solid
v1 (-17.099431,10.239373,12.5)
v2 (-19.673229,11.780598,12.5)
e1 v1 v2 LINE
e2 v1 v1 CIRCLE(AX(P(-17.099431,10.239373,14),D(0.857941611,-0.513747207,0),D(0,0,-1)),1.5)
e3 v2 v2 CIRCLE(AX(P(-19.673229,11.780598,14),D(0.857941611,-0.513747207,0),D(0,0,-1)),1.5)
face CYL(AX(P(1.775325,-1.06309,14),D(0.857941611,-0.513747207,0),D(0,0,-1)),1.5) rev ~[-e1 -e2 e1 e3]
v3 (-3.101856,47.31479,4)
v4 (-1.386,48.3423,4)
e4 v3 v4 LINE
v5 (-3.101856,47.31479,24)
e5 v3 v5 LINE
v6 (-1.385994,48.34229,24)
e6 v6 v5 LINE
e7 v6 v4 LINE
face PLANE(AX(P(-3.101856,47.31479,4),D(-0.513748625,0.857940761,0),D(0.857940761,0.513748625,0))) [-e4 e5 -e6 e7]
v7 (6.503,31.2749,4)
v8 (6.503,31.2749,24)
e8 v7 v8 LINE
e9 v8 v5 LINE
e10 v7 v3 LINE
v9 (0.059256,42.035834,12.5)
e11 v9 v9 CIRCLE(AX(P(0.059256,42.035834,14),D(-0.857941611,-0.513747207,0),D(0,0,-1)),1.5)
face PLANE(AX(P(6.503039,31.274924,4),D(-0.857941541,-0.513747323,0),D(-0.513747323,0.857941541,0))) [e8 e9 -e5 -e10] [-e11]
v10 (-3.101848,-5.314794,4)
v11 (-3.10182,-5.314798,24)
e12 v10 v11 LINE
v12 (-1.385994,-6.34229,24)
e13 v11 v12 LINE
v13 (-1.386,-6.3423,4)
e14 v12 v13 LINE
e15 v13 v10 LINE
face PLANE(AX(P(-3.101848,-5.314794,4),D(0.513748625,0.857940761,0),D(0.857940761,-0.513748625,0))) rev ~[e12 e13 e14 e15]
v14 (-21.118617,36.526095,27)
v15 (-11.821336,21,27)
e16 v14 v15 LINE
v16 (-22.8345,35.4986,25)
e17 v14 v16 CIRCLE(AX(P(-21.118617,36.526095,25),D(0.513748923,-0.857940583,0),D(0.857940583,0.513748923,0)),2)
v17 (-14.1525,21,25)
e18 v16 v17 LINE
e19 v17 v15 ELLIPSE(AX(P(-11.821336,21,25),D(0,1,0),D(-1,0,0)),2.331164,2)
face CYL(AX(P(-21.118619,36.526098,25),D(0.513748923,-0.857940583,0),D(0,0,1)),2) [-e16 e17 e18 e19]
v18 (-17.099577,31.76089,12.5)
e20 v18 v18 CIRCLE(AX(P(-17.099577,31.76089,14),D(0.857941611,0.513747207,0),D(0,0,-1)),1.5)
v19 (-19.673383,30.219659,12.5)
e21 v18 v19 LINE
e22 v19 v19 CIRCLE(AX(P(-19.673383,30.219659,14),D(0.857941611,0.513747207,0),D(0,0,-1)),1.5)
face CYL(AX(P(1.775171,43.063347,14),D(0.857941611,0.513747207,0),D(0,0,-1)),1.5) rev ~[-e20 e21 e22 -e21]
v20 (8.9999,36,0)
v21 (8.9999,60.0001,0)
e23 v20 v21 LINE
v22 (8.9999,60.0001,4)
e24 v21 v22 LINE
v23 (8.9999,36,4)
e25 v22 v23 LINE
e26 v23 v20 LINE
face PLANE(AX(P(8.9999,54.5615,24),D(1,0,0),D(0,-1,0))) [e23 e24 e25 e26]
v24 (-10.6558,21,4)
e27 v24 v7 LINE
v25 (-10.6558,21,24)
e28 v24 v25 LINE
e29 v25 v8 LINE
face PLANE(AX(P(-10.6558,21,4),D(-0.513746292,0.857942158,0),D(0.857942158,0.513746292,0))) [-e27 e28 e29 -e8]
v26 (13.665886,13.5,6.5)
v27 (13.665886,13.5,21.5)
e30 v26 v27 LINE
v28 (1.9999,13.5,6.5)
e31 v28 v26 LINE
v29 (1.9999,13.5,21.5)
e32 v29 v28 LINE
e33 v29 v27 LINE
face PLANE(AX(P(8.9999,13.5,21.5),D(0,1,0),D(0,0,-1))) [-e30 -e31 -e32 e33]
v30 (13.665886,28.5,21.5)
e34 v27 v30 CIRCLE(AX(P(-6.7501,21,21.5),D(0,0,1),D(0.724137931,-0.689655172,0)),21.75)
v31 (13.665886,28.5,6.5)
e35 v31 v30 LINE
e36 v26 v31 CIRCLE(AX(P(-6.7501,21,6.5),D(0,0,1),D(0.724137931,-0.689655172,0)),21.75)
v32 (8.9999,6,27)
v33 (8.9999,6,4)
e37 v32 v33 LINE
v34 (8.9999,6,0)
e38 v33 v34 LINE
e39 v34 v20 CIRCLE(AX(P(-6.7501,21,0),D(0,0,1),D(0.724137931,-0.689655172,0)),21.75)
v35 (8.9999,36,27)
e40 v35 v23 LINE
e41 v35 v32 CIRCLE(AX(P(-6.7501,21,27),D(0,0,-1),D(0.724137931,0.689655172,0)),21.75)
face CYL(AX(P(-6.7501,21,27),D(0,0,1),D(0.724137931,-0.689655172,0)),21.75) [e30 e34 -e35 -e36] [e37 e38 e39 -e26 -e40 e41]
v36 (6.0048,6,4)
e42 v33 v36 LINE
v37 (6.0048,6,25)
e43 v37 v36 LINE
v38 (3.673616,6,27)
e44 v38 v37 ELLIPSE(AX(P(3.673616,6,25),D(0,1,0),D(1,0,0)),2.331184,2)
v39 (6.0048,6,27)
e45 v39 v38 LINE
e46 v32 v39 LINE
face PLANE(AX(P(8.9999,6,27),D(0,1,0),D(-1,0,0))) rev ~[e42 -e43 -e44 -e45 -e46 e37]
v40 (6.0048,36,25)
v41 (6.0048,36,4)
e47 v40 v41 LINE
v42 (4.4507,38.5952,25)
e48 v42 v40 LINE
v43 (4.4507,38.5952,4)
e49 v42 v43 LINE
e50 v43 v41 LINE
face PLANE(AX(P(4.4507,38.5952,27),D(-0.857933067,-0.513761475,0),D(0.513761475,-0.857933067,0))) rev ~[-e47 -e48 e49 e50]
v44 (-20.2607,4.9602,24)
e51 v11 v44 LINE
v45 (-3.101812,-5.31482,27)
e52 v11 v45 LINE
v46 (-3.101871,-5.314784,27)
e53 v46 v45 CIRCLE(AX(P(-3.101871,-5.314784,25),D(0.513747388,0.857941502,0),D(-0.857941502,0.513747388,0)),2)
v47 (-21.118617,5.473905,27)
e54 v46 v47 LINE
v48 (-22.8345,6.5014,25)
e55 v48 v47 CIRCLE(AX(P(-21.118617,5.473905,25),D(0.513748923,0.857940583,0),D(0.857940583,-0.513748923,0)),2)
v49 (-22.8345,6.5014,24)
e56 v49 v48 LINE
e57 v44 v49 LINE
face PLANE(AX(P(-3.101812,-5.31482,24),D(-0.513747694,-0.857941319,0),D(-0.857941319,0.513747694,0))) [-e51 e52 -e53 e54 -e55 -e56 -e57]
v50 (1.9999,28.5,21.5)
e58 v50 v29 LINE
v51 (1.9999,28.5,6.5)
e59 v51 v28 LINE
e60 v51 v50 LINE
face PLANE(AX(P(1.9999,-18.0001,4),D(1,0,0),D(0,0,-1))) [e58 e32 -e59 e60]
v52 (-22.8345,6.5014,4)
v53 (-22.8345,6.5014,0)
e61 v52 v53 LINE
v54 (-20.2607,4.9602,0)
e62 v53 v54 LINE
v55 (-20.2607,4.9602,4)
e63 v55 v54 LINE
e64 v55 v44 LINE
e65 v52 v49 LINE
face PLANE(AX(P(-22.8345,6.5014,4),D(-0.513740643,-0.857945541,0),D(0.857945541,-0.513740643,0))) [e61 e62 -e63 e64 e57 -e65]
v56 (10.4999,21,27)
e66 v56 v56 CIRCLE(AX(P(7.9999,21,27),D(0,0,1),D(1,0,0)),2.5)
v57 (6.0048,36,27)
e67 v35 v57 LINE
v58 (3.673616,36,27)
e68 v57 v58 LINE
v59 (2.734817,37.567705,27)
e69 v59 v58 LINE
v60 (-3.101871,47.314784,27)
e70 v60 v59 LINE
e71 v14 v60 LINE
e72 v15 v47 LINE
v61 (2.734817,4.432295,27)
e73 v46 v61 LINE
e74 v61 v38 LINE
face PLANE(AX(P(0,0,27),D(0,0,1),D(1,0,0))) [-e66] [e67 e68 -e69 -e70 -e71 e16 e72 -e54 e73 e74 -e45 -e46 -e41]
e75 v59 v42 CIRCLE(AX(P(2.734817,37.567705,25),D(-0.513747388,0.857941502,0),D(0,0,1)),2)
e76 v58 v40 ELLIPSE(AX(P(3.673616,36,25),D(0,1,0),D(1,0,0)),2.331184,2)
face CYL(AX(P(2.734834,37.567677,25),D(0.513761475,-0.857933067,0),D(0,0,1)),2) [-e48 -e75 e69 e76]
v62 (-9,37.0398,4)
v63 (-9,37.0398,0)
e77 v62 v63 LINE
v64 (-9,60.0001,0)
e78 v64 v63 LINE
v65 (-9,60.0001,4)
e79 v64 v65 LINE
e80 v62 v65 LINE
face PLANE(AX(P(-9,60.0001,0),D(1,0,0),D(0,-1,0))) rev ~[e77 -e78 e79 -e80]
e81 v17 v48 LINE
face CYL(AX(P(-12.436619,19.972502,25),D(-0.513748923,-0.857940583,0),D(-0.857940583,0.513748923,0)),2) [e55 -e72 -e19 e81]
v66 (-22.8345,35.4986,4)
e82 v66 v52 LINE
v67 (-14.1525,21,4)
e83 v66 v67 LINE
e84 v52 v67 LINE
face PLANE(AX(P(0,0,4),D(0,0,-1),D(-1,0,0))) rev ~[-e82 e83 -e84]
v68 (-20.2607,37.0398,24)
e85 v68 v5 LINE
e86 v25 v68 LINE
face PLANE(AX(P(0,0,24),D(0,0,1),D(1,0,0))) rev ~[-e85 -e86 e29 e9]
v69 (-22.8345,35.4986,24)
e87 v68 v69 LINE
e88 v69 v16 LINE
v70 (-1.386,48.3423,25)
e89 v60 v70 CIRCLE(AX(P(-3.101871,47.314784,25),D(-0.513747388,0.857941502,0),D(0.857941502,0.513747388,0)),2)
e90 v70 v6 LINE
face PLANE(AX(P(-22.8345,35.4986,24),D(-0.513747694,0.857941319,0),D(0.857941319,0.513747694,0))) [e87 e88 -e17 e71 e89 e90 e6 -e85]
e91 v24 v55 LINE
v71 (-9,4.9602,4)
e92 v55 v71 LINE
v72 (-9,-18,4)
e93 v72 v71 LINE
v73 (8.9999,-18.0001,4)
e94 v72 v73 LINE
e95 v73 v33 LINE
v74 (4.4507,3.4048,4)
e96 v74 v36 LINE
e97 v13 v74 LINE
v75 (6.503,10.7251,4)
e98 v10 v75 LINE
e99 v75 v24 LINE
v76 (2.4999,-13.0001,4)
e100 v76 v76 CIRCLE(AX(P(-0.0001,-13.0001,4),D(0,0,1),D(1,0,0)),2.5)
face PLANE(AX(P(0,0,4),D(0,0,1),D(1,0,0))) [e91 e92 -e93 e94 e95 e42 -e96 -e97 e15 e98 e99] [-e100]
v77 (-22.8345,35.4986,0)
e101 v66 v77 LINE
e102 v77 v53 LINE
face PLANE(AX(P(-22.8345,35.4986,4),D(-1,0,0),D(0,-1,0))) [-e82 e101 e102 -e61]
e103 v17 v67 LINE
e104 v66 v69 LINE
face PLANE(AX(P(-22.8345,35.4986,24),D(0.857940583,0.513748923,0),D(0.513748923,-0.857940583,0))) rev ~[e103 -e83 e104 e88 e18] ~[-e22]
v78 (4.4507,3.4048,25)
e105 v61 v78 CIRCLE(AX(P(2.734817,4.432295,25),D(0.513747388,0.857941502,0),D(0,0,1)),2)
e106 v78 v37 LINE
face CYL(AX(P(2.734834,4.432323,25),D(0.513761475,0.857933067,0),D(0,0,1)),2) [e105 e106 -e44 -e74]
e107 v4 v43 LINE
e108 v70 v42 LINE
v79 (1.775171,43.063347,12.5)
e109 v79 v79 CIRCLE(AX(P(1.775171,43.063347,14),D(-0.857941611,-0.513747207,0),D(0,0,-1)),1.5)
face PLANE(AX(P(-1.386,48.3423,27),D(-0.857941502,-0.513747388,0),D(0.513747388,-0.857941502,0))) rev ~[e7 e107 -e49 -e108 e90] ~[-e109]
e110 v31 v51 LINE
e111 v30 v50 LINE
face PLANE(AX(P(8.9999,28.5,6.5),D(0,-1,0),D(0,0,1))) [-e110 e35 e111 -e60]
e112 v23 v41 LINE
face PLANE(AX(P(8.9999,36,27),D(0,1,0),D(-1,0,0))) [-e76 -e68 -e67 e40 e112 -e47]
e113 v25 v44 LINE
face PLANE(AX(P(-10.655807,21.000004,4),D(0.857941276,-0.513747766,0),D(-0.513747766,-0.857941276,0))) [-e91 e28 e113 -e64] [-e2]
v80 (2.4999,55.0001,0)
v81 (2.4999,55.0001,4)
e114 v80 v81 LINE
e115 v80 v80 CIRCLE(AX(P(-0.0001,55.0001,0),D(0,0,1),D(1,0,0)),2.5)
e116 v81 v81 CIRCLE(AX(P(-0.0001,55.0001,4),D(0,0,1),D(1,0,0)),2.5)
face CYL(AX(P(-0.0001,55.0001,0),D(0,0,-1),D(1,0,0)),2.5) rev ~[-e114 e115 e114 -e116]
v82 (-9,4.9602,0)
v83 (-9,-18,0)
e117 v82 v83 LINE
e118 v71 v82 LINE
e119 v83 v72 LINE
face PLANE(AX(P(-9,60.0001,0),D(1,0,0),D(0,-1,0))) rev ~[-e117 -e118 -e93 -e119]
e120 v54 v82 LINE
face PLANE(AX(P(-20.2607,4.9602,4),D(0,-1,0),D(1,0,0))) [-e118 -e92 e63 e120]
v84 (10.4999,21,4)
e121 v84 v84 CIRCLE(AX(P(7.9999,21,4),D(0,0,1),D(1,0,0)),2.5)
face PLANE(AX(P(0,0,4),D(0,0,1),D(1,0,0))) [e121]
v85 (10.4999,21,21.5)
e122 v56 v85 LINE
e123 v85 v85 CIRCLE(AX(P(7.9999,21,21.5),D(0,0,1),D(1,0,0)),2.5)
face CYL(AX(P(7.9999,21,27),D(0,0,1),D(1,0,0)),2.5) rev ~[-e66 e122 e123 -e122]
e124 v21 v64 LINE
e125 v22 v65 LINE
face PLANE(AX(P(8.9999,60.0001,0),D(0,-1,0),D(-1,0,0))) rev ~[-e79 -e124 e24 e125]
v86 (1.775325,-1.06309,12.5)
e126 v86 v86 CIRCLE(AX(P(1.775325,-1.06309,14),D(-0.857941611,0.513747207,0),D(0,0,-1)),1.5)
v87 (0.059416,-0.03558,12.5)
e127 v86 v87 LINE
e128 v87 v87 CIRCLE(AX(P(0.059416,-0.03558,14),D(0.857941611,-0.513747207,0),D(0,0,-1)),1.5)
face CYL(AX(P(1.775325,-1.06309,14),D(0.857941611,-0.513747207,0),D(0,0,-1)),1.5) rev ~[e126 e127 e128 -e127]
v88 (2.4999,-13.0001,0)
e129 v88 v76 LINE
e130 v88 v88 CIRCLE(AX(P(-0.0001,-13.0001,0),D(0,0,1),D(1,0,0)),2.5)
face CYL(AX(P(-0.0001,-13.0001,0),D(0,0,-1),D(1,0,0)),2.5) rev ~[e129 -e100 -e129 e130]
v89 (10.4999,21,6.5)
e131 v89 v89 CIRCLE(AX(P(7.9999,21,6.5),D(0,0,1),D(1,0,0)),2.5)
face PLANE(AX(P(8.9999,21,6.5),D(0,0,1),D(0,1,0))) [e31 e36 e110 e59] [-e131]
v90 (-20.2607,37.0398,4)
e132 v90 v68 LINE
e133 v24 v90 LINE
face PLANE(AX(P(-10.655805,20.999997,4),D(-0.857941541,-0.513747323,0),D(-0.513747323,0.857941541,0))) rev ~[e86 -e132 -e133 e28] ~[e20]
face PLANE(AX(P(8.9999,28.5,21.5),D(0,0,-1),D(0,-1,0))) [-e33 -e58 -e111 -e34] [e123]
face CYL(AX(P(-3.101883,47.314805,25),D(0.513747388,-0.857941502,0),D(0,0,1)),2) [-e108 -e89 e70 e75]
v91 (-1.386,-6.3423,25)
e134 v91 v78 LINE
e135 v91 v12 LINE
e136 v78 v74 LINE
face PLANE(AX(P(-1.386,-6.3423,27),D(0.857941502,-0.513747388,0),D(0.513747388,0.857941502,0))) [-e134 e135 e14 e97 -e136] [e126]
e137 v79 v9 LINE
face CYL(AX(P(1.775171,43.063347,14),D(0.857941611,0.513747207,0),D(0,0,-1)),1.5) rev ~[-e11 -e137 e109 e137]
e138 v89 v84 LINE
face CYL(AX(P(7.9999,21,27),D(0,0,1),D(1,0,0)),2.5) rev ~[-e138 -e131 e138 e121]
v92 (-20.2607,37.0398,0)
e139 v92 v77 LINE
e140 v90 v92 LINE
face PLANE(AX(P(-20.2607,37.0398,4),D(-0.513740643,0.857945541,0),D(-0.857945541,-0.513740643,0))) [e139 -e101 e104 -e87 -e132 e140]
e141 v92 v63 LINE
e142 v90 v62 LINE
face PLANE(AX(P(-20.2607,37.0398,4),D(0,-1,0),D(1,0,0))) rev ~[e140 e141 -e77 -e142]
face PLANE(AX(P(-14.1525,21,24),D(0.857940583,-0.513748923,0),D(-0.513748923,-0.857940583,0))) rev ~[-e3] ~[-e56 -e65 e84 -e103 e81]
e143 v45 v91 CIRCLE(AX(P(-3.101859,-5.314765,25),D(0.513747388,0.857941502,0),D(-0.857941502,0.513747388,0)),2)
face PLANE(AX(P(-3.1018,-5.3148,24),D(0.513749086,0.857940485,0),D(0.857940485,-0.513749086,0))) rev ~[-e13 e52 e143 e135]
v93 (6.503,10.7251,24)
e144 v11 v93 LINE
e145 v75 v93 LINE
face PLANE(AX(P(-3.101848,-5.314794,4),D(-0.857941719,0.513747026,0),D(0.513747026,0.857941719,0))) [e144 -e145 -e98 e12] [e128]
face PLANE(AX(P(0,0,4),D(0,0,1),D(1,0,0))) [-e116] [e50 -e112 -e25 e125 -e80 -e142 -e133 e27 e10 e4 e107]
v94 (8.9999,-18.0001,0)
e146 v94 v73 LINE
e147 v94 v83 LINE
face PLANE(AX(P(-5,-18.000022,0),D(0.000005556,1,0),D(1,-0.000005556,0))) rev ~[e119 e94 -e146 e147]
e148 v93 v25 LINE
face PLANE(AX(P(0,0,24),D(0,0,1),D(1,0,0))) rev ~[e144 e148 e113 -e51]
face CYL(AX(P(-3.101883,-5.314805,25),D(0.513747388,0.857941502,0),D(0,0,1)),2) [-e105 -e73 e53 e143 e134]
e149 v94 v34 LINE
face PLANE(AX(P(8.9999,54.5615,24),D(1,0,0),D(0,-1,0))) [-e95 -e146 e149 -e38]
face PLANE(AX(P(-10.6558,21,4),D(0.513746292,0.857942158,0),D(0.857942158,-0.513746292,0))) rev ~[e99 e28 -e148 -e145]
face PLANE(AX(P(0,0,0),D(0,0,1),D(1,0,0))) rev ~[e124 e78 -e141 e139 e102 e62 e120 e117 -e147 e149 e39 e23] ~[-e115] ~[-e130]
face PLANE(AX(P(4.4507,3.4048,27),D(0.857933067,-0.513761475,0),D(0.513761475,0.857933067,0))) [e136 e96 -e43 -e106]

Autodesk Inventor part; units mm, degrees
ref_plane "YZ Plane" through (0, 0, 0) normal (1, 0, 0) x (0, 1, 0)
sketch "Sketch1" plane through (0, 0, 0) normal (0, 0, 1) x (1, 0, 0)
  circle A0 centre (-0.0001, 55.0001) radius 2.5 projected
  line L0 (-9, 60.0001) -> (-9, 34.0001) projected
  line L1 (-9, 34.0001) -> (-5.0001, 34.0001) projected
  line L2 (-5.0001, 34.0001) -> (-5.0001, 45.0001) projected
  line L3 (-5.0001, 45.0001) -> (4.9999, 45.0001) projected
  line L4 (4.9999, 45.0001) -> (4.9999, 34.0001) projected
  line L5 (4.9999, 34.0001) -> (8.9999, 34.0001) projected
  line L6 (8.9999, 34.0001) -> (8.9999, 60.0001) projected
  line L7 (8.9999, 60.0001) -> (-9, 60.0001) projected
  line L8 (-9, 8) -> (-9, -18) projected
  line L9 (-5, -18) -> (-5, -8) projected
  circle A1 centre (-0.0001, -13.0001) radius 2.5 projected
  line L10 (8.9999, -18.0001) -> (8.9999, 7.9999) projected
  line L11 (8.9999, 7.9999) -> (4.9999, 7.9999) projected
  line L12 (4.9999, 7.9999) -> (4.9999, 2.5001) projected
  line L13 (5, -3) -> (-5.0001, -3.0001) projected
  line L14 (-5.0001, -3.0001) -> (-5.0001, 7.9999) projected
  line L15 (-5.0001, 7.9999) -> (-9, 7.9999) projected
  line L16 (-9, -18.0001) -> (8.9999, -18.0001) projected
  line L17 (8.9999, 60.0001) -> (-9, 60.0001)
  line L18 (-9, 60.0001) -> (-9, -18)
  line L19 (-9, -18) -> (8.9999, -18)
  line L20 (8.9999, -18) -> (8.9999, 60.0001)
  circle A2 centre (-0.0001, 55.0001) radius 2.5
  circle A3 centre (-0.0001, -13.0001) radius 2.5
  line L21 (-9, 7.9999) -> (-9, -18.0001) projected
  line L22 (4.9999, 2.5001) -> (5, -3) projected
  point P0 (0, 0)
  dimension "d0" = 4
  dimension "d1" = 0
extrude "Extrusion1" add sketch "Sketch1" along normal blind 4
sketch "Sketch2" plane through (0, 0, 4) normal (0, 0, 1) x (1, 0, 0)
  circle A0 centre (-55.3, -73.0192) radius 2.5 projected
  circle A1 centre (-55.3001, 115.0193) radius 2.5 projected
  line L0 (-55.3, -73.0192) -> (33.584, 75.4143)
  line L1 (-55.3001, 115.0193) -> (26.1085, -20.9304)
  line L2 (-9, 60) -> (-9, -18) projected
  line L3 (-9, 21) -> (62.9573, 21)
  line L4 (1, 21) -> (-7.5794, 15.8625)
  line L5 (-55.3001, 115.0193) -> (-50.1626, 106.4399)
  line L6 (-50.1626, 106.4399) -> (-41.5832, 111.5774)
  line L7 (-50.1626, 106.4399) -> (-58.742, 101.3024)
  line L8 (-7.5794, 15.8625) -> (-58.742, 101.3024)
  line L9 (1, 21) -> (9.5794, 26.1375)
  line L10 (9.5794, 26.1375) -> (-41.5832, 111.5774)
  line L11 (1, 21) -> (-7.5794, 26.1375)
  line L12 (1, 21) -> (9.5794, 15.8625)
  line L13 (-55.3, -73.0192) -> (-50.1625, -64.4398)
  line L14 (-93.1275, -68.5) -> (-47.8, -94.6699) projected
  line L15 (-50.1625, -64.4398) -> (-41.5831, -69.5773)
  line L16 (-50.1625, -64.4398) -> (-58.742, -59.3023)
  line L17 (-41.5831, -69.5773) -> (9.5794, 15.8625)
  line L18 (-7.5794, 26.1375) -> (-58.742, -59.3023)
  line L19 (-10.6558, 21) -> (6.503, 31.2749)
  line L20 (-10.6558, 21) -> (6.503, 10.7251)
  circle A2 centre (-0.0001, -13.0001) radius 2.5 projected
  circle A3 centre (-0.0001, -13.0001) radius 5
  circle A4 centre (-0.0001, 55.0001) radius 2.5 projected
  circle A5 centre (-0.0001, 55.0001) radius 5
  line L21 (8.9999, 60.0001) -> (-9, 60.0001) projected
  line L22 (-9, -18.0001) -> (8.9999, -18.0001) projected
  line L23 (-20.2607, 4.9602) -> (12.7451, -14.8042)
  line L24 (-20.2607, 37.0398) -> (12.7451, 56.8042)
  line L25 (-20.2607, 4.9602) -> (-22.8345, 6.5014)
  line L26 (-9, 21) -> (-33.1607, 21)
  line L27 (-22.8345, 6.5014) -> (-14.1525, 21)
  line L28 (-20.2607, 37.0398) -> (-22.8345, 35.4986)
  line L29 (-22.8345, 35.4986) -> (-14.1525, 21)
  line L30 (6.503, 10.7251) -> (8.9999, 9.2299)
  line L31 (8.9999, -18.0001) -> (8.9999, 60.0001) projected
  line L32 (6.503, 31.2749) -> (8.9999, 32.7701)
  line L33 (8.9999, 32.7701) -> (-0.605, 48.8099)
  line L34 (8.9999, 9.2299) -> (-0.605, -6.8099)
  line L35 (8.9999, 32.7701) -> (8.9999, 9.2299)
  line L36 (-22.8345, 6.5014) -> (-22.8345, 35.4986)
  point P0 (0, 0)
  point P1 (-20.2607, 37.0398)
  point P2 (6.503, 10.7251)
  point P3 (-3.1018, -5.3148)
  point P4 (8.524, 8.4352)
  point P5 (7.516, 10.1185)
  point P6 (-3.1019, 47.3148)
  point P7 (6.503, 31.2749)
  point P8 (-2.0764, 26.1375)
  point P9 (-11.6813, 42.1773)
  point P10 (6.8279, 11.2676)
  point P11 (8.9999, 14.8947)
  point P12 (8.9999, 16.2096)
  point P13 (6.503, 10.7251)
  point P14 (8.9999, 25.7904)
  point P15 (6.503, 31.2749)
  point P16 (8.9999, 27.1053)
  point P17 (8.9999, 32.7701)
  point P18 (8.9999, 32.7704)
  point P19 (8.9999, 9.2299)
  point P20 (8.9999, 7.6404)
  point P21 (8.9999, 9.2296)
  point P22 (8.9999, 54.5615)
  point P23 (8.9999, -12.5615)
  dimension "d0" = 4
  dimension "d1" = 0
  dimension "d2" = 10
  dimension "d3" = 10
  dimension "d4" = 10
  dimension "d5" = 10
  dimension "d6" = 10
  dimension "d7" = 10
  dimension "d8" = 10
  dimension "d9" = 10
  dimension "d10" = 10
  dimension "d11" = 10
  dimension "d12" = 10
  dimension "d13" = 20
  dimension "d14" = 20
  dimension "d15" = 3
  dimension "d16" = 3
extrude "Extrusion2" add sketch "Sketch2" along normal blind 20 contours L25 L27 L26 L18 | L20 L4 L0 | L0 L1 L17 L20 | L26 L29 L28 L8 | L26 L2 L20 | L19 L2 L26 | L17 L30 L1 L34 L23 | L1 L19 L10 L0 | L11 L19 L1 | L12 L31 L17 L1 | L4 L20 L2 L3 | L9 L31 L3 | L0 L10 L31 L9 | L3 L2 L19 L11 | L3 L31 L12 | L17 L1 L30 | L34 L1 L31 L23 | L10 L32 L0 | L0 L32 L31 L10 | L17 L31 L30 L1 | L30 L34 L1 | L34 L31 L1 | L32 L10 L24 L33 L0 | L0 L33 L32 | L33 L24 L31 L0 | L0 L31 L33
sketch "Sketch3" plane through (0, 0, 4) normal (0, 0, -1) x (-1, 0, 0)
  line L0 (10.6558, 21) -> (20.2607, 37.0398) projected
  line L1 (20.2607, 37.0398) -> (8.9915, 37.0398)
  line L2 (20.2607, 4.9602) -> (10.6558, 21) projected
  line L3 (20.2607, 4.9602) -> (9, 4.9602)
  line L4 (9, 20.0085) -> (9, -18) projected
  line L5 (22.8345, 35.4986) -> (14.1525, 21) projected
  line L6 (22.8345, 6.5014) -> (20.2607, 4.9602) projected
  line L7 (22.8345, 35.4986) -> (22.8345, 6.5014)
  line L8 (9, 60) -> (9, -18) projected
  line L9 (10.6558, 21) -> (9, 20.0085) projected
  line L10 (9, 21.9915) -> (10.6558, 21) projected
  line L11 (22.8345, 6.5014) -> (20.2607, 4.9602) projected
  line L12 (14.1525, 21) -> (22.8345, 6.5014) projected
  line L13 (22.8345, 35.4986) -> (14.1525, 21) projected
  line L14 (20.2607, 37.0398) -> (22.8345, 35.4986) projected
  line L15 (10.6558, 21) -> (20.2607, 37.0398) projected
  line L16 (20.2607, 4.9602) -> (10.6558, 21) projected
  line L17 (-8.9999, 60.0001) -> (9, 60.0001) projected
  line L18 (-8.9999, -18.0001) -> (-8.9999, 60.0001) projected
  line L19 (9, -18.0001) -> (-8.9999, -18.0001) projected
  circle A0 centre (0.0001, -13.0001) radius 2.5 projected
  circle A1 centre (0.0001, 55.0001) radius 2.5 projected
  line L20 (9, 60.0001) -> (9, -18.0001) projected
  point P0 (0, 0)
  point P1 (9, 37.0398)
  dimension "d0" = 4
  dimension "d1" = 0
ref_plane "Work Plane1" through (-20.2583, -25.7942, 0) normal (0, 0, 1) x (1, 0, 0)
extrude "Extrusion3" add sketch "Sketch3" along normal up to surface (4 mm away) contours L10 L8 L1 L0 | L0 L14 L5 L12 L6 L2 | L2 L3 L4 L9 | L9 L8 L10 | L7 L12 L5
ref_plane "Work Plane4" through (8.9999, -18.0001, 0) normal (1, 0, 0) x (0, 0, -1)
sketch "Sketch12" plane through (0, 0, 24) normal (0, 0, 1) x (1, 0, 0)
  line L0 (-3.1018, -5.3148) -> (8.9999, -12.5615) projected
  line L1 (-14.1525, 21) -> (-22.8345, 6.5014) projected
  line L2 (8.9999, -12.5615) -> (-22.8345, 6.5014)
  line L3 (-22.8345, 6.5014) -> (-14.1525, 21)
  line L4 (-22.8345, 35.4986) -> (-14.1525, 21) projected
  line L5 (-14.1525, 21) -> (-22.8345, 35.4986)
  line L6 (-22.8345, 35.4986) -> (8.9999, 54.5615)
  line L7 (8.9999, 54.5615) -> (8.9999, -12.5615)
  point P0 (0, 0)
extrude "Extrusion12" add sketch "Sketch12" along normal blind 3
sketch "Sketch13" plane through (0, 0, 27) normal (0, 0, 1) x (1, 0, 0)
  line L0 (8.9999, -12.5615) -> (8.9999, 54.5615) projected
  line L1 (8.9999, 21) -> (14.9999, 21)
  line L2 (8.9999, 21) -> (8.9999, 6)
  line L3 (8.9999, 21) -> (8.9999, 36)
  arc A0 (8.9999, 6) -> (8.9999, 36) centre (-6.7501, 21) ccw
  point P0 (0, 0)
  dimension "d52" = 6
  dimension "d53" = 15
  dimension "d54" = 15
extrude "Extrusion13" add sketch "Sketch13" against normal up to surface (27 mm away)
sketch "Sketch14" plane through (0, 0, 27) normal (0, 0, 1) x (1, 0, 0)
  arc A0 (8.9999, 6) -> (8.9999, 36) centre (-6.7501, 21) ccw projected
  line L0 (14.9999, 21) -> (7.9999, 21)
  circle A1 centre (7.9999, 21) radius 2.5
  point P0 (0, 0)
  dimension "d57" = 7
  dimension "d58" = 5
extrude "Extrusion14" cut sketch "Sketch14" against normal up to surface (23 mm away)
sketch "Sketch15" plane through (8.9999, -18.0001, 4) normal (1, 0, 0) x (0, 0, -1)
  line L0 (-23, 54.0001) -> (-23, 24.0001) projected
  line L1 (-23, 39.0001) -> (-10, 39.0001)
  line L2 (0, 39.0001) -> (-20, 39.0001) projected
  line L3 (-17.5, 31.5001) -> (-2.5, 31.5001)
  line L4 (-2.5, 31.5001) -> (-2.5, 46.5001)
  line L5 (-2.5, 46.5001) -> (-17.5, 46.5001)
  line L6 (-17.5, 46.5001) -> (-17.5, 31.5001)
  line L7 (-17.5, 31.5001) -> (-2.5, 46.5001) construction
  line L8 (-2.5, 31.5001) -> (-17.5, 46.5001) construction
  point P0 (4, 18.0001)
  dimension "d61" = 15
  dimension "d62" = 15
extrude "Extrusion15" cut sketch "Sketch15" along normal blind 10 and the other way blind 7
sketch "Sketch16" plane through (0, 0, 27) normal (0, 0, 1) x (1, 0, 0)
  line L0 (-3.1018, -5.3148) -> (6.503, 10.7251) projected
  line L1 (6.503, 31.2749) -> (-3.1019, 47.3148) projected
  line L2 (-3.1018, -5.3148) -> (-1.386, -6.3423)
  line L3 (-22.8345, 6.5014) -> (8.9999, -12.5615) projected
  line L4 (-1.386, -6.3423) -> (4.4507, 3.4048)
  line L5 (8.9999, -12.5615) -> (8.9999, 6) projected
  line L6 (8.9999, 6) -> (-9.8503, 6)
  line L7 (4.4507, 3.4048) -> (6.0048, 6)
  line L8 (-22.8345, 35.4986) -> (-14.1525, 21) projected
  line L9 (-14.1525, 21) -> (17.1457, 21)
  line L10 (-22.8345, 35.4986) -> (8.9999, 54.5615)
  line L11 (-1.386, 48.3423) -> (4.4507, 38.5952)
  line L12 (8.9999, 54.5615) -> (8.9999, 36)
  line L13 (8.9999, 36) -> (-9.8503, 36)
  line L14 (4.4507, 38.5952) -> (6.0048, 36)
  point P0 (0, 0)
  dimension "d67" = 2
extrude "Extrusion16" cut sketch "Sketch16" against normal up to surface (23 mm away) contours L4 L7 L6 L5 L3 | L14 L11 L10 L12 L13
sketch "Sketch17" plane through (6.0048, 6, 27) normal (0.8579416, -0.5137472, 0) x (0, 0, -1)
  line L0 (0, 2.5134) -> (0, -14.3859) projected
  line L1 (0, -8.2326) -> (13, -8.2326)
  circle A0 centre (13, -8.2326) radius 1.5
  point P0 (27, -8.2326)
  dimension "d71" = 13
  dimension "d72" = 3
extrude "Extrusion17" cut sketch "Sketch17" against normal through all
sketch "Sketch18" plane through (6.0048, 36, 27) normal (0.8579416, 0.5137472, 0) x (0, 0, -1)
  line L0 (23, 14.3859) -> (0, 14.3859) projected
  line L1 (0, 14.3859) -> (0, 8.2329)
  line L2 (0, 14.3859) -> (0, -2.5134) projected
  line L3 (0, 8.2329) -> (13, 8.2329)
  circle A0 centre (13, 8.2329) radius 1.5
  point P0 (27, -27.801)
  dimension "d75" = 6.153
  dimension "d76" = 13
  dimension "d77" = 3
extrude "Extrusion18" cut sketch "Sketch18" against normal through all
fillet "Fillet1" radius 2 4 edges at (2.3094, 42.1711, 27) (2.3094, -0.1711, 27) (-18.4935, 13.7507, 27) (-18.4935, 28.2493, 27)
properties part number "2020_top_guide_mnt" material "PET Plastic"
